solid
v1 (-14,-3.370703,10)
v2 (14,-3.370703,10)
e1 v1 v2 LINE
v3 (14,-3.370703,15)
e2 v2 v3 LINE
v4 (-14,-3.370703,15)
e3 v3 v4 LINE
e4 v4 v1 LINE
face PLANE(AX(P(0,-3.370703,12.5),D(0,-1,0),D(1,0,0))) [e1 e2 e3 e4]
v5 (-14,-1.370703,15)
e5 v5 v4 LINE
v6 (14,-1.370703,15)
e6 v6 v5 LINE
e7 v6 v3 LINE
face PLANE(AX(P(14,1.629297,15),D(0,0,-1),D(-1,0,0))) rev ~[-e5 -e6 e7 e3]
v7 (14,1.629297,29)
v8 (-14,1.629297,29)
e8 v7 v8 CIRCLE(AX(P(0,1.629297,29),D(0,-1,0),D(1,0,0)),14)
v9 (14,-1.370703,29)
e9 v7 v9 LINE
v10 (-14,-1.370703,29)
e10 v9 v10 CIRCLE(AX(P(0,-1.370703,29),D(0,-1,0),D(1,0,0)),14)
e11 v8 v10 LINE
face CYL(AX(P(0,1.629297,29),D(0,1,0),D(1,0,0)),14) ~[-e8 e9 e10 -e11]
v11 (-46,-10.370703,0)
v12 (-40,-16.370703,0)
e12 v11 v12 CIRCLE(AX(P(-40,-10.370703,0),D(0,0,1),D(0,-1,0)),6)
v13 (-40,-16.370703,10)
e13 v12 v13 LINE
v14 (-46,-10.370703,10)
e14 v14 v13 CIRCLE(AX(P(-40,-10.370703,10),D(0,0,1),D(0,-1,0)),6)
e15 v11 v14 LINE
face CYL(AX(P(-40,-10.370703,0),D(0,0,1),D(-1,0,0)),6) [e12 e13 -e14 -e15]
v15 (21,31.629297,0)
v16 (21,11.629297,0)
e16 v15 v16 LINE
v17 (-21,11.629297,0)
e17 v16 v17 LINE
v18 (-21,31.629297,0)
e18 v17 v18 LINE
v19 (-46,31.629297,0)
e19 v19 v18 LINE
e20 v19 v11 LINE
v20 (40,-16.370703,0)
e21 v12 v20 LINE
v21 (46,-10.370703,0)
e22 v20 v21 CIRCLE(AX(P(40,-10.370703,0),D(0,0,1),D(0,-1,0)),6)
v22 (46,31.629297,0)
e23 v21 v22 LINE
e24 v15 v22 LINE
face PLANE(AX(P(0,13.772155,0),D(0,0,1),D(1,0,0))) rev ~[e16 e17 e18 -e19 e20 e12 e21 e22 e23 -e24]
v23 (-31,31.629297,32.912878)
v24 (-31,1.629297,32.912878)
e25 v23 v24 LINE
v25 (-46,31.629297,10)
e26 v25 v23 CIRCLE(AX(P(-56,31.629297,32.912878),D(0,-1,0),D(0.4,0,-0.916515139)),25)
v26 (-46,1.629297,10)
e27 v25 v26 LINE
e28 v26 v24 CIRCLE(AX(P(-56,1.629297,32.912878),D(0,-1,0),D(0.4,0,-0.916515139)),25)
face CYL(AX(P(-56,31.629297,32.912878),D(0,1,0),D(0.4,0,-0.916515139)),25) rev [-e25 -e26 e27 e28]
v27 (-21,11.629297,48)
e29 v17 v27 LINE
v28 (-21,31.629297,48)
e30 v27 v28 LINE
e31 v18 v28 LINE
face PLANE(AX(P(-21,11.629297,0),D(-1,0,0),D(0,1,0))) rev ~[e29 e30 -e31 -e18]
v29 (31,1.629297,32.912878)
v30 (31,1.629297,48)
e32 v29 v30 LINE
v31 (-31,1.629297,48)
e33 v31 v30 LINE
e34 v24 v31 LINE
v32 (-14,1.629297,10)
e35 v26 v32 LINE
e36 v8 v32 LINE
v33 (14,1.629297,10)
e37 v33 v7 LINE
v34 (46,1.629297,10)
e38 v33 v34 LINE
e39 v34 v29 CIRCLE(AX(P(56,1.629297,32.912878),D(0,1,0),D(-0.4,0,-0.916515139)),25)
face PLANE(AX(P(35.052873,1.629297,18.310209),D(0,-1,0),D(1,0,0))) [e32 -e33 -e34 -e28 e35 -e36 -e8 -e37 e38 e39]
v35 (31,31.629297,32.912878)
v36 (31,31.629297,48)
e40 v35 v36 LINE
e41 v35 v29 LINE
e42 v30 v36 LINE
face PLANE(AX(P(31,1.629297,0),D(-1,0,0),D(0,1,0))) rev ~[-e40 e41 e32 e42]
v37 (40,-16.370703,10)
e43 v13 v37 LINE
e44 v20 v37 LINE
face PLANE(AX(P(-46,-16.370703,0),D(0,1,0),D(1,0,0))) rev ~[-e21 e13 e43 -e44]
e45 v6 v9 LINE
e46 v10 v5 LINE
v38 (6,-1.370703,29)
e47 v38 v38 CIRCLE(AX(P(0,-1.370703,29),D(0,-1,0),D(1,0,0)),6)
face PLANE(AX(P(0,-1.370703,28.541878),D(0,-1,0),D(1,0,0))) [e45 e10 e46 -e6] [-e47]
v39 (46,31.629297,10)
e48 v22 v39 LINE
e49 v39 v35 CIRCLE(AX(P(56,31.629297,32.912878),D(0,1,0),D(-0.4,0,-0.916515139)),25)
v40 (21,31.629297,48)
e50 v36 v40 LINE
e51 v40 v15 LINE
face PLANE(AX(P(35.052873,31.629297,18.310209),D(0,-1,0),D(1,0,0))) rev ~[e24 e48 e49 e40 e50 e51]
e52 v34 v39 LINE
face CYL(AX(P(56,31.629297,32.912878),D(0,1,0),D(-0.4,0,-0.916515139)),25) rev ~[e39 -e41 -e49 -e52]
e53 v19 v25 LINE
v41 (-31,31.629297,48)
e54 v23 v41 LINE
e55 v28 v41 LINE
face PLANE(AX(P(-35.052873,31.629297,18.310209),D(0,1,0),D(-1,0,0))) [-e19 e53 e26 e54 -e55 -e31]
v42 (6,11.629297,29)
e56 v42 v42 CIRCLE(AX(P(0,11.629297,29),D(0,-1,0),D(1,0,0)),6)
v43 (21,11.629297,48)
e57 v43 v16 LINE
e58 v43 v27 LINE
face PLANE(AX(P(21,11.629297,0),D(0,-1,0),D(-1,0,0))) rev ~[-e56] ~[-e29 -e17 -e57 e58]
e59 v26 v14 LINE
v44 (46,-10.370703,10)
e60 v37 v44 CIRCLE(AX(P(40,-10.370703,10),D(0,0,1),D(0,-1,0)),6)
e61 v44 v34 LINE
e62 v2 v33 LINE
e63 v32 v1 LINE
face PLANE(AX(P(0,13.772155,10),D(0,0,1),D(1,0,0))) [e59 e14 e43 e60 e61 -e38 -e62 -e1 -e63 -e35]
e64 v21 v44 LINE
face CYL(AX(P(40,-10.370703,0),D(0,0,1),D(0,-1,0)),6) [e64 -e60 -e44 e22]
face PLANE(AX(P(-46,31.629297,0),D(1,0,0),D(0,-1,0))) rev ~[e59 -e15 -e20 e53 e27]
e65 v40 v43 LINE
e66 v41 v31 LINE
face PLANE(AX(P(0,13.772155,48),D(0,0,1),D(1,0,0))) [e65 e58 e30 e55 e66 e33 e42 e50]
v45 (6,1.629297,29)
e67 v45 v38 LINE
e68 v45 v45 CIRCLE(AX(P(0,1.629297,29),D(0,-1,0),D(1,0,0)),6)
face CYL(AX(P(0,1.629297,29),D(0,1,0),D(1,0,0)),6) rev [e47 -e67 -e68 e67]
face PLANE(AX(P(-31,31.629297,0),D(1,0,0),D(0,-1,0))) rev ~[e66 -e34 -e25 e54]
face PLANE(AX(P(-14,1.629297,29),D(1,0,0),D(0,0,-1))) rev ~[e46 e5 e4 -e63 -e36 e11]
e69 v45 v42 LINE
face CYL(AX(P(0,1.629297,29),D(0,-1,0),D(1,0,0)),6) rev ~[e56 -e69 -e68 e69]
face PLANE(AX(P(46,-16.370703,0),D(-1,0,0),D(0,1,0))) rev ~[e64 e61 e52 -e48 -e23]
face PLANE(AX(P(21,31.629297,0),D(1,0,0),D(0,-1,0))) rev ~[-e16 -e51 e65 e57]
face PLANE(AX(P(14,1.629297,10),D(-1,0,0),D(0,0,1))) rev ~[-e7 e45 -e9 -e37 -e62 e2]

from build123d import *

# Parameters (mm, degrees)
F1_DEPTH    = 48
F2_DEPTH    = 10
F3_R        = 6
F4_T1_DEPTH = 30
F5_T1_DEPTH = 30
F7_DEPTH    = 5
F6_R        = 6
F8_DEPTH    = 3
F9_DEPTH    = 25


# Not quite as in the source:
# - a fillet or chamfer that OpenCascade refuses, or shapes differently, is made with other operations: its cross-section is extruded or revolved along the edge and cut away or added


with BuildPart() as f1:
    # F0 (on Top) → F1 (new body)
    with BuildSketch(Plane.XY):
        Polygon((21, 11.6292974651), (0, 11.6292974651), (-21, 11.6292974651), (-21, 31.6292974651), (-31, 31.6292974651), (-31, 1.6292974651), (0, 1.6292974651), (31, 1.6292974651), (31, 31.6292974651), (21, 31.6292974651), align=None)
    extrude(amount=F1_DEPTH)

    # F0 (on Top) → F2 (join)
    with BuildSketch(Plane.XY):
        Polygon((21, 11.6292974651), (0, 11.6292974651), (-21, 11.6292974651), (-21, 31.6292974651), (-31, 31.6292974651), (-31, 1.6292974651), (0, 1.6292974651), (31, 1.6292974651), (31, 31.6292974651), (21, 31.6292974651), align=None)
        Polygon((-31, 1.6292974651), (-31, 31.6292974651), (-46, 31.6292974651), (-46, -16.3707025349), (0, -16.3707025349), (46, -16.3707025349), (46, 31.6292974651), (31, 31.6292974651), (31, 1.6292974651), (0, 1.6292974651), align=None)
    extrude(amount=F2_DEPTH)

    # F3
    f3_edges = [f1.edges().sort_by_distance(p)[0] for p in [
        (-46, -16.370703, 5),
        (46, -16.370703, 5),
    ]]
    fillet(f3_edges, radius=F3_R)

    # F4: fillet of radius 25 on 1 edges, made by hand

    # F4_s2 → F4_t1 (join)
    with BuildSketch(Plane.XZ.offset(-31.6292974651)):
        with BuildLine():
            ThreePointArc((-46, 10), (-35.0834993366, 19.2198145372), (-31, 32.9128784748))
            Line((-31, 32.9128784748), (-31, 10))
            Line((-31, 10), (-46, 10))
        make_face()
    extrude(amount=F4_T1_DEPTH)

    # F5: fillet of radius 25 on 1 edges, made by hand

    # F5_s2 → F5_t1 (join)
    with BuildSketch(Plane.XZ.offset(-31.6292974651)):
        with BuildLine():
            ThreePointArc((46, 10), (35.0834993366, 19.2198145372), (31, 32.9128784748))
            Line((31, 32.9128784748), (31, 10))
            Line((31, 10), (46, 10))
        make_face()
    extrude(amount=F5_T1_DEPTH)

    # F6 (on face) → F7 (join)
    with BuildSketch(Plane.XZ.offset(-1.6292974651)):
        Polygon((14, 15), (0, 15), (-14, 15), (-14, 10), (14, 10), align=None)
    extrude(amount=F7_DEPTH)

    # F6 (on face) → F8 (join)
    with BuildSketch(Plane.XZ.offset(-1.6292974651)):
        with BuildLine():
            ThreePointArc((0, 15), (9.8994949366, 19.1005050634), (14, 29))
            ThreePointArc((14, 29), (0, 43), (-14, 29))
            ThreePointArc((-14, 29), (-9.8994949366, 19.1005050634), (0, 15))
        make_face()
        with Locations((0, 29)):
            Circle(F6_R, mode=Mode.SUBTRACT)
        with BuildLine():
            Line((14, 15), (14, 29))
            ThreePointArc((14, 29), (9.8994949366, 19.1005050634), (0, 15))
            Line((0, 15), (14, 15))
        make_face()
        with BuildLine():
            ThreePointArc((0, 15), (-9.8994949366, 19.1005050634), (-14, 29))
            Line((-14, 29), (-14, 15))
            Line((-14, 15), (0, 15))
        make_face()
        Polygon((14, 15), (0, 15), (-14, 15), (-14, 10), (14, 10), align=None)
    extrude(amount=F8_DEPTH)

    # F9 (cut): a face of the model
    f9_faces = [f1.faces().sort_by_distance(p)[0] for p in [
        (0, 1.6292974651, 29),
    ]]
    extrude(f9_faces, amount=-F9_DEPTH, mode=Mode.SUBTRACT)


solid = f1.part
